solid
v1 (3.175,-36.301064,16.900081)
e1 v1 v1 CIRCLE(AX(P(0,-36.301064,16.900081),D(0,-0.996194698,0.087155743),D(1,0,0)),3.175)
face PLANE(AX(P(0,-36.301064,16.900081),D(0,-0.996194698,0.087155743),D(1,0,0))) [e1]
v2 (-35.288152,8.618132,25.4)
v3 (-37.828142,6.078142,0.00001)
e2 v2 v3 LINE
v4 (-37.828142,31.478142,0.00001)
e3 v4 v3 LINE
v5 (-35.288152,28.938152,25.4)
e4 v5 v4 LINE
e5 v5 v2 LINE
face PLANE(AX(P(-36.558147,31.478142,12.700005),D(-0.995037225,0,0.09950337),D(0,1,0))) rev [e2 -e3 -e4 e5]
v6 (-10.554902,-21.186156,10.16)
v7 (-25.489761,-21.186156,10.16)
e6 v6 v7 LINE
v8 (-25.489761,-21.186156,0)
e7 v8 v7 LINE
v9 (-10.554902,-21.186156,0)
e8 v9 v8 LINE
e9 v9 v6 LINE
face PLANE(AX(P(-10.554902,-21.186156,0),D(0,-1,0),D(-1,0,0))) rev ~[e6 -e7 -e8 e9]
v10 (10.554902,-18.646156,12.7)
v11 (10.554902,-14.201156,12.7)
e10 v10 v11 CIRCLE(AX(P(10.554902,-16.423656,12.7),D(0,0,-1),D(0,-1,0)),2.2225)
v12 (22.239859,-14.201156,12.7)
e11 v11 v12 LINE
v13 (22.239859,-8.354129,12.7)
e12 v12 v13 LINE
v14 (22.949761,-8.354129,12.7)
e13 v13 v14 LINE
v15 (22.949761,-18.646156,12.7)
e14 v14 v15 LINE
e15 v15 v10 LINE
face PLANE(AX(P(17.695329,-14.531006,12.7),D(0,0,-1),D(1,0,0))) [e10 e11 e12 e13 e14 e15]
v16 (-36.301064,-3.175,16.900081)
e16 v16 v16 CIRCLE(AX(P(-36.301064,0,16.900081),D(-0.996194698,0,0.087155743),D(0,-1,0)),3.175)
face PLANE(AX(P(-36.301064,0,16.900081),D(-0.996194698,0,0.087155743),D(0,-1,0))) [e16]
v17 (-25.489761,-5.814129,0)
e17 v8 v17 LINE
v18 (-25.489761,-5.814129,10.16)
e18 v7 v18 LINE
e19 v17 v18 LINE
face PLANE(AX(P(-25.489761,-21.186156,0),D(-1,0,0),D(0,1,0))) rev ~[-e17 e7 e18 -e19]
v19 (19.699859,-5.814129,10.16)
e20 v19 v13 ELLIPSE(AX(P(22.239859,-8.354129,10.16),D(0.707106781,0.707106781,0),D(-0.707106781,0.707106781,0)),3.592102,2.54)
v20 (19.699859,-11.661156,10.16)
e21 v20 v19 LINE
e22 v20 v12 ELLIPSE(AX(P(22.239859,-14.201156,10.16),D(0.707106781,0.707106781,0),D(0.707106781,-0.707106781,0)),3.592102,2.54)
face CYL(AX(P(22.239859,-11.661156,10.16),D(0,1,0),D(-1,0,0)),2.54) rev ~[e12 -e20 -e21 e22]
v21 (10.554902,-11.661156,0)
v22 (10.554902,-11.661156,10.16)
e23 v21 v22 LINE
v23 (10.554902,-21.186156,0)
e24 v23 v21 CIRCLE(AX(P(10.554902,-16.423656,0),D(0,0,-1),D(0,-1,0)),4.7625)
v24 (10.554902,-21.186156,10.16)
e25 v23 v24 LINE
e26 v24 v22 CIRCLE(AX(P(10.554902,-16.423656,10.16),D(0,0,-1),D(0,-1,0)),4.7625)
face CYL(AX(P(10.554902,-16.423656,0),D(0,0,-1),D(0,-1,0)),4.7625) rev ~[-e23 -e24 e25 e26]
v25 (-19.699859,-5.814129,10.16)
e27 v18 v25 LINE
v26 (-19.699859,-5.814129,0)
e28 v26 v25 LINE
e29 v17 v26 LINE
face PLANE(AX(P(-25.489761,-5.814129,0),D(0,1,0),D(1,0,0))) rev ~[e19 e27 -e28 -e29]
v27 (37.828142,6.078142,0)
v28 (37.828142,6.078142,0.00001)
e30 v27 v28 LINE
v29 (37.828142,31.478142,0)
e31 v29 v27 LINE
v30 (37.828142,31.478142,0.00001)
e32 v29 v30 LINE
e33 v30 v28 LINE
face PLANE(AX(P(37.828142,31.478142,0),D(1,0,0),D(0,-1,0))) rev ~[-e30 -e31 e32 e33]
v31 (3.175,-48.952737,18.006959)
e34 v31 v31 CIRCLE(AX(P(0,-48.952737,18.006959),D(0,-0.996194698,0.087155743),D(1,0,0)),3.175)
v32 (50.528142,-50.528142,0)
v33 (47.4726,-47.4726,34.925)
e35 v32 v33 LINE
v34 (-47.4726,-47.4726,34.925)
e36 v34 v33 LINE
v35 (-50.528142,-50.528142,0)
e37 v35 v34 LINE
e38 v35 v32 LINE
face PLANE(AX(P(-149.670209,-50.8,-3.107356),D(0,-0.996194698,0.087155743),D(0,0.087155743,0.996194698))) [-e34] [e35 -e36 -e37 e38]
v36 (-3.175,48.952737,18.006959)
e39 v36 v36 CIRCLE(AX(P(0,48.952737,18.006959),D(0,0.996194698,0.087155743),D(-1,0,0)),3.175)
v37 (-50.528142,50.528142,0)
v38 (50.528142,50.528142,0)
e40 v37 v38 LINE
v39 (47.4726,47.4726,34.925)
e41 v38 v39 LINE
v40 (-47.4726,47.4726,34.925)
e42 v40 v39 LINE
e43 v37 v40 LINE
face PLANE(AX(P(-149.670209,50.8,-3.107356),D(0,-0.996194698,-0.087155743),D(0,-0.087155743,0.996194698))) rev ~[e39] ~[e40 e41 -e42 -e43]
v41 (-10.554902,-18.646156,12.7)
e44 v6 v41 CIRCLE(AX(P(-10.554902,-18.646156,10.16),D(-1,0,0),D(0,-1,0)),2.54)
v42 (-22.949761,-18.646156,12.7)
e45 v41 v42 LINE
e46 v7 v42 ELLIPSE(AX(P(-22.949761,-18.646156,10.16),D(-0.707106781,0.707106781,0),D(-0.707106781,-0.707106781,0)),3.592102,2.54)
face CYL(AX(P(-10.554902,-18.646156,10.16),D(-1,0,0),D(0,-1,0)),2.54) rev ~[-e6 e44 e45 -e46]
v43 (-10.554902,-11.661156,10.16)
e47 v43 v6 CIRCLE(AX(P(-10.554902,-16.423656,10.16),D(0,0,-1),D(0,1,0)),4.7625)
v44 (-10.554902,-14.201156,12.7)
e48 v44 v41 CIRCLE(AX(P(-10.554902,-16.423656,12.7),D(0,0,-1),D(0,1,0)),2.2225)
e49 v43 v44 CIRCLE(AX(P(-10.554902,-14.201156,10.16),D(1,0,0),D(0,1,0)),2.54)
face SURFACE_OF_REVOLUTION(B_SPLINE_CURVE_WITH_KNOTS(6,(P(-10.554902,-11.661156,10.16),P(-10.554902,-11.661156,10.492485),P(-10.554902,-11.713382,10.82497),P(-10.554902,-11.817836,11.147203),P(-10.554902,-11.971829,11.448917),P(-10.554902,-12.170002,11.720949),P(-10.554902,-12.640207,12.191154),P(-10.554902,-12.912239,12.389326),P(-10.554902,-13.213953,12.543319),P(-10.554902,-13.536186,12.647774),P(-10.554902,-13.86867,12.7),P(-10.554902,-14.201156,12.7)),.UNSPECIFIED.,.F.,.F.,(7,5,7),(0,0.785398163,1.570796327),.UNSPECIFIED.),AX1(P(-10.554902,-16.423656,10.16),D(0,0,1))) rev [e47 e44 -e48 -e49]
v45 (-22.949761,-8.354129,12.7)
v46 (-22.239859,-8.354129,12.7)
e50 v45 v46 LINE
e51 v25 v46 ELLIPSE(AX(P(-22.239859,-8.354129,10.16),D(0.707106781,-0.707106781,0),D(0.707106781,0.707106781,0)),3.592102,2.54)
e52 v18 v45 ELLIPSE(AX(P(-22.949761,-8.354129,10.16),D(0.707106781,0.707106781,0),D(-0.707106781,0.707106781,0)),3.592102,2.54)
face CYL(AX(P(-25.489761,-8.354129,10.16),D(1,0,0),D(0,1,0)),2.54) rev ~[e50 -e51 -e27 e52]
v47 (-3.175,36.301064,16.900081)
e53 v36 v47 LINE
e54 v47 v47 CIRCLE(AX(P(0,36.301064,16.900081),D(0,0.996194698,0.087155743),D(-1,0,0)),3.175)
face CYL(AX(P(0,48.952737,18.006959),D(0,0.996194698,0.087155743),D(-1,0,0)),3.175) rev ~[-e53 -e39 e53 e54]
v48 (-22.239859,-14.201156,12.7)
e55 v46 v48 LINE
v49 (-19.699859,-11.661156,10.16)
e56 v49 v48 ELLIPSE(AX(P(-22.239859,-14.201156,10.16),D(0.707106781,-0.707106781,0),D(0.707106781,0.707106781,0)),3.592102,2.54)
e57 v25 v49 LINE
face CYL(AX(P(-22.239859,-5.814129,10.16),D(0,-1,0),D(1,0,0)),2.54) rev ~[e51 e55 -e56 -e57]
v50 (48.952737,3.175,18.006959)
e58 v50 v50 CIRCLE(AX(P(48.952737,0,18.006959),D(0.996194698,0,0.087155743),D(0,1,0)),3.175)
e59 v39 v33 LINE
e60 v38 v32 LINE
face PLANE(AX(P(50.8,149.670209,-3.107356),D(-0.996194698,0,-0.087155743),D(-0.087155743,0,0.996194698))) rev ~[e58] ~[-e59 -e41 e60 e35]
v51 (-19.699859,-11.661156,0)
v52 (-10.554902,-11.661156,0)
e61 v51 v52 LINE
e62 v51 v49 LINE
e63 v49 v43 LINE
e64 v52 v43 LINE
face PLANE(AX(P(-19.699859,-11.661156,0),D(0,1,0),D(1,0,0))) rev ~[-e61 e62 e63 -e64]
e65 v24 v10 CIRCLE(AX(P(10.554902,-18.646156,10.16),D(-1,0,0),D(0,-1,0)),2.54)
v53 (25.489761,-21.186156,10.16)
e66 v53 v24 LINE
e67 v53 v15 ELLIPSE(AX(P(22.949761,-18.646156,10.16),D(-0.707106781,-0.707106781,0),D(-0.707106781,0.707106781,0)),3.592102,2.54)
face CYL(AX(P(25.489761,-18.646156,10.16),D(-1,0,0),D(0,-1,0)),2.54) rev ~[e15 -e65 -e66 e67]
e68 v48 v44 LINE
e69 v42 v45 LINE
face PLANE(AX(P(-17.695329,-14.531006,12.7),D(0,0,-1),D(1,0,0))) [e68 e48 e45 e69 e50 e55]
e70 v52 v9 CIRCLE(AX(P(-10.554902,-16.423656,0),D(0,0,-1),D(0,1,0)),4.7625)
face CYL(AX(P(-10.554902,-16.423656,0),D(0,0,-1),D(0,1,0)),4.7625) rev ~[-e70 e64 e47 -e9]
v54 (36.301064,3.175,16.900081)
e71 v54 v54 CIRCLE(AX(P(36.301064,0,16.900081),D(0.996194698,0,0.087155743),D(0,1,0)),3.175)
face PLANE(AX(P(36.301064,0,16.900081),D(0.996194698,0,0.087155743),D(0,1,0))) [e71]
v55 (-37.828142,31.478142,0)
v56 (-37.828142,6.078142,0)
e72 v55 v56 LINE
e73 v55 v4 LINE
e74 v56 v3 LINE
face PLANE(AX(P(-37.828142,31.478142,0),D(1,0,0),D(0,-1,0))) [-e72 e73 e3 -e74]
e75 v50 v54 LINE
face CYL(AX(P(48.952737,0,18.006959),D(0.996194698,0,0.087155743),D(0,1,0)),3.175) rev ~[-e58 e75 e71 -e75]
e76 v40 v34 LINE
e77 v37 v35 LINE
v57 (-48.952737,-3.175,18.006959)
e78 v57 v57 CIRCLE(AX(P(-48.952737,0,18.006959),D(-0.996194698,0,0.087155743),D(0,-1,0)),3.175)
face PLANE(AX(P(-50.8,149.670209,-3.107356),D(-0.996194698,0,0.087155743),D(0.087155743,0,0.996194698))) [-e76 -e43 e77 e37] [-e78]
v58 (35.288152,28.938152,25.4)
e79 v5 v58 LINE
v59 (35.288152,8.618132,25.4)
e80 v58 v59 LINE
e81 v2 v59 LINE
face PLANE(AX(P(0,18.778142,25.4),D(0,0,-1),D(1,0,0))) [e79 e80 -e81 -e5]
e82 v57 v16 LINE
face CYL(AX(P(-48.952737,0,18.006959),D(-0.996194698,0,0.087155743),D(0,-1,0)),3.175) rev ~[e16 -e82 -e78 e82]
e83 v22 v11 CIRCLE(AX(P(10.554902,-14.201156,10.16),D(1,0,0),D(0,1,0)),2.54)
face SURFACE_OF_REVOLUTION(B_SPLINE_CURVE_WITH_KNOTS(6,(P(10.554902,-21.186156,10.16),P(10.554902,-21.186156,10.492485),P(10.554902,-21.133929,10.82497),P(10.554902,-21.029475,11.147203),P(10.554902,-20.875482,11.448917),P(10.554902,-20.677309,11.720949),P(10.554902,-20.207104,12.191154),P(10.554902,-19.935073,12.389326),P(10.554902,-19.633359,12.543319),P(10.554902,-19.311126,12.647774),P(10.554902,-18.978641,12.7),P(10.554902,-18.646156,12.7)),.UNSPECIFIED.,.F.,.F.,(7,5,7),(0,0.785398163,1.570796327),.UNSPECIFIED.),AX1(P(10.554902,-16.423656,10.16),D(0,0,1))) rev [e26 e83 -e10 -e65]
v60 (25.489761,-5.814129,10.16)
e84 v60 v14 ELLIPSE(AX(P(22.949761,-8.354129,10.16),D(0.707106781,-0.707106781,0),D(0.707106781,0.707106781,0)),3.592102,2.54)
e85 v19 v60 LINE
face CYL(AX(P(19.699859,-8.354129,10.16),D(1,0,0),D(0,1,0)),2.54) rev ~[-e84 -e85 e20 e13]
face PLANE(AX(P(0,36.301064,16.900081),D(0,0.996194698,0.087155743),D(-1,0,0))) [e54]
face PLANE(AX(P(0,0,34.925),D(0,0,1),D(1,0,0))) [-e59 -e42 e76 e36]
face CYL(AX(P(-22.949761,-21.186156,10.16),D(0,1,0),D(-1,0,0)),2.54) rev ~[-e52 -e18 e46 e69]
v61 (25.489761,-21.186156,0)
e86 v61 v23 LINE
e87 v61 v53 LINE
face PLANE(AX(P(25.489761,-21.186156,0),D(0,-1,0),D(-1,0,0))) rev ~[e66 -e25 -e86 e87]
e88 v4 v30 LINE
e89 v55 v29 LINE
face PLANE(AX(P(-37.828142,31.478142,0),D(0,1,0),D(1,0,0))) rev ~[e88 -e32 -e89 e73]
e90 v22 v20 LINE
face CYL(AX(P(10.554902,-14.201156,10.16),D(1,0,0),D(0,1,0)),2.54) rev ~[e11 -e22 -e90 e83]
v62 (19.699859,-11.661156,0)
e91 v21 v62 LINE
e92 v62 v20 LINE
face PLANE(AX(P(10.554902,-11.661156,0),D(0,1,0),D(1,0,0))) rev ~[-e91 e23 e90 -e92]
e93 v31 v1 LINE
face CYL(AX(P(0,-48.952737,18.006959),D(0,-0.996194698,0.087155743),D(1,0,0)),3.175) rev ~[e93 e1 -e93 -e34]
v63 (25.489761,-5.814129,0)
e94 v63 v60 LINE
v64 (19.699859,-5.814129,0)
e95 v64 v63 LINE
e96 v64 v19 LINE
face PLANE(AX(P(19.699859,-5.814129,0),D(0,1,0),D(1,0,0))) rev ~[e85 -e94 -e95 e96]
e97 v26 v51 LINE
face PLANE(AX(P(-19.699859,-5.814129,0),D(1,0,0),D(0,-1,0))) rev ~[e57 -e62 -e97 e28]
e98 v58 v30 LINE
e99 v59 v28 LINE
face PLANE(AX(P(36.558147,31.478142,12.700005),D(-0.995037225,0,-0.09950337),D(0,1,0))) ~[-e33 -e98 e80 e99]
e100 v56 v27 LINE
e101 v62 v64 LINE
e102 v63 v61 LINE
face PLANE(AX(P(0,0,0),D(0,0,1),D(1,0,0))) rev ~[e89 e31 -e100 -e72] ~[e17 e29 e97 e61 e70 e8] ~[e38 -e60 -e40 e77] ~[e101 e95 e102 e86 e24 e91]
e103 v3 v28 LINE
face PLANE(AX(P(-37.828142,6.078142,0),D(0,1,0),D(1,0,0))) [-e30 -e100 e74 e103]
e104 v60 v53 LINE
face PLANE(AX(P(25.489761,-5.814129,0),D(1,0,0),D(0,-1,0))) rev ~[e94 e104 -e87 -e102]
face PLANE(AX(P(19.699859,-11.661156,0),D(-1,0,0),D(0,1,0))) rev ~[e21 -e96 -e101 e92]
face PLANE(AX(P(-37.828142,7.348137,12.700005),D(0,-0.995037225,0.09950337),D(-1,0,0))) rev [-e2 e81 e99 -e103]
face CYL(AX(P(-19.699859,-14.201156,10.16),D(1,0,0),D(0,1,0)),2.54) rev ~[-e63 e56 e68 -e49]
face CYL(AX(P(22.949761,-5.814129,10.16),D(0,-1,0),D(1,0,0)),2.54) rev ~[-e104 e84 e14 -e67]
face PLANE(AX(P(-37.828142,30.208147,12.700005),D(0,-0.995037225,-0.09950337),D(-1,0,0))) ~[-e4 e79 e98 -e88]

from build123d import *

# Parameters (mm, degrees)
F0_W        = 101.6
F0_H        = 101.6
F1_DEPTH    = 34.925
F2_T1_DEPTH = 299.3404177556
F2_T3_DEPTH = 299.3404177556
F3_R        = 3.175
F4_DEPTH    = 12.7
F5_R        = 3.175
F6_DEPTH    = 12.7
F7_R        = 3.175
F8_DEPTH    = 12.7
F9_R        = 3.175
F10_DEPTH   = 12.7
F11_W       = 75.6562831473
F11_H       = 25.4
F12_DEPTH   = 25.4
F13_SIZE2   = 25.39999
F13_SIZE    = 2.53999
F15_DEPTH   = 12.7
F16_R       = 2.54


# Not quite as in the source:
# - a fillet or chamfer that OpenCascade refuses, or shapes differently, is made with other operations: its cross-section is extruded or revolved along the edge and cut away or added
# - a fillet or chamfer is up to 0.001 mm smaller than in the source, because OpenCascade refuses the exact size


with BuildPart() as f1:
    # F0 (on Top) → F1 (new body)
    with BuildSketch(Plane.XY):
        Rectangle(F0_W, F0_H)
    extrude(amount=F1_DEPTH)

    # F2: chamfer of 3.3274 x 38.0323560322 on 4 edges, made by hand

    # F2_s2 → F2_t1 (cut)
    with BuildSketch(Plane.XZ.offset(-149.6702088778)):
        Polygon((-50.8, -3.1073560322), (-47.4726, 34.925), (-50.8, 34.925), align=None)
        Polygon((50.8, -3.1073560322), (47.4726, 34.925), (50.8, 34.925), align=None)
    extrude(amount=F2_T1_DEPTH, mode=Mode.SUBTRACT)

    # F2_s4 → F2_t3 (cut)
    with BuildSketch(Plane.YZ.offset(-149.6702088778)):
        Polygon((-50.8, -3.1073560322), (-47.4726, 34.925), (-50.8, 34.925), align=None)
        Polygon((50.8, -3.1073560322), (47.4726, 34.925), (50.8, 34.925), align=None)
    extrude(amount=F2_T3_DEPTH, mode=Mode.SUBTRACT)

    # F3 (on face) → F4 (cut)
    with BuildSketch(Plane(origin=(0, 50.1443235703, 4.3870598526), x_dir=(-1, 0, 0), z_dir=(0, 0.9961946981, 0.0871557427))):
        with Locations((0, 13.6719250414)):
            Circle(F3_R)
    extrude(amount=-F4_DEPTH, mode=Mode.SUBTRACT)

    # F5 (on face) → F6 (cut)
    with BuildSketch(Plane(origin=(0, -50.1443235703, 4.3870598526), x_dir=(1, 0, 0), z_dir=(0, -0.9961946981, 0.0871557427))):
        with Locations((0, 13.6719250414)):
            Circle(F5_R)
    extrude(amount=-F6_DEPTH, mode=Mode.SUBTRACT)

    # F7 (on face) → F8 (cut)
    with BuildSketch(Plane(origin=(50.1443235703, 0, 4.3870598526), x_dir=(0, 1, 0), z_dir=(0.9961946981, 0, 0.0871557427))):
        with Locations((0, 13.6719250414)):
            Circle(F7_R)
    extrude(amount=-F8_DEPTH, mode=Mode.SUBTRACT)

    # F9 (on face) → F10 (cut)
    with BuildSketch(Plane(origin=(-50.1443235703, 0, 4.3870598526), x_dir=(0, -1, 0), z_dir=(-0.9961946981, 0, 0.0871557427))):
        with Locations((0, 13.6719250414)):
            Circle(F9_R)
    extrude(amount=-F10_DEPTH, mode=Mode.SUBTRACT)

    # F11 (on face) → F12 (cut)
    with BuildSketch(Plane(origin=(0, 0, 0), x_dir=(1, 0, 0), z_dir=(0, 0, -1))):
        with Locations((0, -18.7781415736)):
            Rectangle(F11_W, F11_H)
    extrude(amount=-F12_DEPTH, mode=Mode.SUBTRACT)

    # F13 (size 2.54 and 25.4 in the source; OpenCascade refuses exactly that, so slightly less here)
    f13_edges = [f1.edges().sort_by_distance(p)[0] for p in [
        (0, 6.078142, 25.4),
        (-37.828142, 18.778142, 25.4),
        (0, 31.478142, 25.4),
        (37.828142, 18.778142, 25.4),
    ]]
    f13_side = f1.faces().sort_by_distance((0, 18.778142, 25.4))[0]
    chamfer(f13_edges, length=F13_SIZE, length2=F13_SIZE2, reference=f13_side)

    # F14 (on face) → F15 (cut)
    with BuildSketch(Plane(origin=(0, 0, 0), x_dir=(1, 0, 0), z_dir=(0, 0, -1))):
        with BuildLine():
            Line((-19.6998585016, 11.6611556837), (-10.5549017823, 11.6611556837))
            ThreePointArc((-10.5549017823, 11.6611556837), (-5.7924017823, 16.4236556837), (-10.5549017823, 21.1861556837))
            Line((-10.5549017823, 21.1861556837), (-19.6998585016, 21.1861556837))
            Line((-19.6998585016, 21.1861556837), (-25.4897605628, 21.1861556837))
            Line((-25.4897605628, 21.1861556837), (-25.4897605628, 11.6611556837))
            Line((-25.4897605628, 11.6611556837), (-25.4897605628, 5.814129021))
            Line((-25.4897605628, 5.814129021), (-19.6998585016, 5.814129021))
            Line((-19.6998585016, 5.814129021), (-19.6998585016, 11.6611556837))
        make_face()
        with BuildLine():
            Line((25.4897605628, 11.6611556837), (25.4897605628, 21.1861556837))
            Line((25.4897605628, 21.1861556837), (19.6998585016, 21.1861556837))
            Line((19.6998585016, 21.1861556837), (10.5549017823, 21.1861556837))
            ThreePointArc((10.5549017823, 21.1861556837), (5.7924017823, 16.4236556837), (10.5549017823, 11.6611556837))
            Line((10.5549017823, 11.6611556837), (19.6998585016, 11.6611556837))
            Line((19.6998585016, 11.6611556837), (19.6998585016, 5.814129021))
            Line((19.6998585016, 5.814129021), (25.4897605628, 5.814129021))
            Line((25.4897605628, 5.814129021), (25.4897605628, 11.6611556837))
        make_face()
    extrude(amount=-F15_DEPTH, mode=Mode.SUBTRACT)

    # F16
    f16_edges = [f1.edges().sort_by_distance(p)[0] for p in [
        (-15.12738, -11.661156, 12.7),
        (-5.792402, -16.423656, 12.7),
        (-18.022331, -21.186156, 12.7),
        (-25.489761, -13.500142, 12.7),
        (-22.59481, -5.814129, 12.7),
        (-19.699859, -8.737642, 12.7),
        (18.022331, -21.186156, 12.7),
        (5.792402, -16.423656, 12.7),
        (15.12738, -11.661156, 12.7),
        (19.699859, -8.737642, 12.7),
        (22.59481, -5.814129, 12.7),
        (25.489761, -13.500142, 12.7),
    ]]
    fillet(f16_edges, radius=F16_R)


solid = f1.part
